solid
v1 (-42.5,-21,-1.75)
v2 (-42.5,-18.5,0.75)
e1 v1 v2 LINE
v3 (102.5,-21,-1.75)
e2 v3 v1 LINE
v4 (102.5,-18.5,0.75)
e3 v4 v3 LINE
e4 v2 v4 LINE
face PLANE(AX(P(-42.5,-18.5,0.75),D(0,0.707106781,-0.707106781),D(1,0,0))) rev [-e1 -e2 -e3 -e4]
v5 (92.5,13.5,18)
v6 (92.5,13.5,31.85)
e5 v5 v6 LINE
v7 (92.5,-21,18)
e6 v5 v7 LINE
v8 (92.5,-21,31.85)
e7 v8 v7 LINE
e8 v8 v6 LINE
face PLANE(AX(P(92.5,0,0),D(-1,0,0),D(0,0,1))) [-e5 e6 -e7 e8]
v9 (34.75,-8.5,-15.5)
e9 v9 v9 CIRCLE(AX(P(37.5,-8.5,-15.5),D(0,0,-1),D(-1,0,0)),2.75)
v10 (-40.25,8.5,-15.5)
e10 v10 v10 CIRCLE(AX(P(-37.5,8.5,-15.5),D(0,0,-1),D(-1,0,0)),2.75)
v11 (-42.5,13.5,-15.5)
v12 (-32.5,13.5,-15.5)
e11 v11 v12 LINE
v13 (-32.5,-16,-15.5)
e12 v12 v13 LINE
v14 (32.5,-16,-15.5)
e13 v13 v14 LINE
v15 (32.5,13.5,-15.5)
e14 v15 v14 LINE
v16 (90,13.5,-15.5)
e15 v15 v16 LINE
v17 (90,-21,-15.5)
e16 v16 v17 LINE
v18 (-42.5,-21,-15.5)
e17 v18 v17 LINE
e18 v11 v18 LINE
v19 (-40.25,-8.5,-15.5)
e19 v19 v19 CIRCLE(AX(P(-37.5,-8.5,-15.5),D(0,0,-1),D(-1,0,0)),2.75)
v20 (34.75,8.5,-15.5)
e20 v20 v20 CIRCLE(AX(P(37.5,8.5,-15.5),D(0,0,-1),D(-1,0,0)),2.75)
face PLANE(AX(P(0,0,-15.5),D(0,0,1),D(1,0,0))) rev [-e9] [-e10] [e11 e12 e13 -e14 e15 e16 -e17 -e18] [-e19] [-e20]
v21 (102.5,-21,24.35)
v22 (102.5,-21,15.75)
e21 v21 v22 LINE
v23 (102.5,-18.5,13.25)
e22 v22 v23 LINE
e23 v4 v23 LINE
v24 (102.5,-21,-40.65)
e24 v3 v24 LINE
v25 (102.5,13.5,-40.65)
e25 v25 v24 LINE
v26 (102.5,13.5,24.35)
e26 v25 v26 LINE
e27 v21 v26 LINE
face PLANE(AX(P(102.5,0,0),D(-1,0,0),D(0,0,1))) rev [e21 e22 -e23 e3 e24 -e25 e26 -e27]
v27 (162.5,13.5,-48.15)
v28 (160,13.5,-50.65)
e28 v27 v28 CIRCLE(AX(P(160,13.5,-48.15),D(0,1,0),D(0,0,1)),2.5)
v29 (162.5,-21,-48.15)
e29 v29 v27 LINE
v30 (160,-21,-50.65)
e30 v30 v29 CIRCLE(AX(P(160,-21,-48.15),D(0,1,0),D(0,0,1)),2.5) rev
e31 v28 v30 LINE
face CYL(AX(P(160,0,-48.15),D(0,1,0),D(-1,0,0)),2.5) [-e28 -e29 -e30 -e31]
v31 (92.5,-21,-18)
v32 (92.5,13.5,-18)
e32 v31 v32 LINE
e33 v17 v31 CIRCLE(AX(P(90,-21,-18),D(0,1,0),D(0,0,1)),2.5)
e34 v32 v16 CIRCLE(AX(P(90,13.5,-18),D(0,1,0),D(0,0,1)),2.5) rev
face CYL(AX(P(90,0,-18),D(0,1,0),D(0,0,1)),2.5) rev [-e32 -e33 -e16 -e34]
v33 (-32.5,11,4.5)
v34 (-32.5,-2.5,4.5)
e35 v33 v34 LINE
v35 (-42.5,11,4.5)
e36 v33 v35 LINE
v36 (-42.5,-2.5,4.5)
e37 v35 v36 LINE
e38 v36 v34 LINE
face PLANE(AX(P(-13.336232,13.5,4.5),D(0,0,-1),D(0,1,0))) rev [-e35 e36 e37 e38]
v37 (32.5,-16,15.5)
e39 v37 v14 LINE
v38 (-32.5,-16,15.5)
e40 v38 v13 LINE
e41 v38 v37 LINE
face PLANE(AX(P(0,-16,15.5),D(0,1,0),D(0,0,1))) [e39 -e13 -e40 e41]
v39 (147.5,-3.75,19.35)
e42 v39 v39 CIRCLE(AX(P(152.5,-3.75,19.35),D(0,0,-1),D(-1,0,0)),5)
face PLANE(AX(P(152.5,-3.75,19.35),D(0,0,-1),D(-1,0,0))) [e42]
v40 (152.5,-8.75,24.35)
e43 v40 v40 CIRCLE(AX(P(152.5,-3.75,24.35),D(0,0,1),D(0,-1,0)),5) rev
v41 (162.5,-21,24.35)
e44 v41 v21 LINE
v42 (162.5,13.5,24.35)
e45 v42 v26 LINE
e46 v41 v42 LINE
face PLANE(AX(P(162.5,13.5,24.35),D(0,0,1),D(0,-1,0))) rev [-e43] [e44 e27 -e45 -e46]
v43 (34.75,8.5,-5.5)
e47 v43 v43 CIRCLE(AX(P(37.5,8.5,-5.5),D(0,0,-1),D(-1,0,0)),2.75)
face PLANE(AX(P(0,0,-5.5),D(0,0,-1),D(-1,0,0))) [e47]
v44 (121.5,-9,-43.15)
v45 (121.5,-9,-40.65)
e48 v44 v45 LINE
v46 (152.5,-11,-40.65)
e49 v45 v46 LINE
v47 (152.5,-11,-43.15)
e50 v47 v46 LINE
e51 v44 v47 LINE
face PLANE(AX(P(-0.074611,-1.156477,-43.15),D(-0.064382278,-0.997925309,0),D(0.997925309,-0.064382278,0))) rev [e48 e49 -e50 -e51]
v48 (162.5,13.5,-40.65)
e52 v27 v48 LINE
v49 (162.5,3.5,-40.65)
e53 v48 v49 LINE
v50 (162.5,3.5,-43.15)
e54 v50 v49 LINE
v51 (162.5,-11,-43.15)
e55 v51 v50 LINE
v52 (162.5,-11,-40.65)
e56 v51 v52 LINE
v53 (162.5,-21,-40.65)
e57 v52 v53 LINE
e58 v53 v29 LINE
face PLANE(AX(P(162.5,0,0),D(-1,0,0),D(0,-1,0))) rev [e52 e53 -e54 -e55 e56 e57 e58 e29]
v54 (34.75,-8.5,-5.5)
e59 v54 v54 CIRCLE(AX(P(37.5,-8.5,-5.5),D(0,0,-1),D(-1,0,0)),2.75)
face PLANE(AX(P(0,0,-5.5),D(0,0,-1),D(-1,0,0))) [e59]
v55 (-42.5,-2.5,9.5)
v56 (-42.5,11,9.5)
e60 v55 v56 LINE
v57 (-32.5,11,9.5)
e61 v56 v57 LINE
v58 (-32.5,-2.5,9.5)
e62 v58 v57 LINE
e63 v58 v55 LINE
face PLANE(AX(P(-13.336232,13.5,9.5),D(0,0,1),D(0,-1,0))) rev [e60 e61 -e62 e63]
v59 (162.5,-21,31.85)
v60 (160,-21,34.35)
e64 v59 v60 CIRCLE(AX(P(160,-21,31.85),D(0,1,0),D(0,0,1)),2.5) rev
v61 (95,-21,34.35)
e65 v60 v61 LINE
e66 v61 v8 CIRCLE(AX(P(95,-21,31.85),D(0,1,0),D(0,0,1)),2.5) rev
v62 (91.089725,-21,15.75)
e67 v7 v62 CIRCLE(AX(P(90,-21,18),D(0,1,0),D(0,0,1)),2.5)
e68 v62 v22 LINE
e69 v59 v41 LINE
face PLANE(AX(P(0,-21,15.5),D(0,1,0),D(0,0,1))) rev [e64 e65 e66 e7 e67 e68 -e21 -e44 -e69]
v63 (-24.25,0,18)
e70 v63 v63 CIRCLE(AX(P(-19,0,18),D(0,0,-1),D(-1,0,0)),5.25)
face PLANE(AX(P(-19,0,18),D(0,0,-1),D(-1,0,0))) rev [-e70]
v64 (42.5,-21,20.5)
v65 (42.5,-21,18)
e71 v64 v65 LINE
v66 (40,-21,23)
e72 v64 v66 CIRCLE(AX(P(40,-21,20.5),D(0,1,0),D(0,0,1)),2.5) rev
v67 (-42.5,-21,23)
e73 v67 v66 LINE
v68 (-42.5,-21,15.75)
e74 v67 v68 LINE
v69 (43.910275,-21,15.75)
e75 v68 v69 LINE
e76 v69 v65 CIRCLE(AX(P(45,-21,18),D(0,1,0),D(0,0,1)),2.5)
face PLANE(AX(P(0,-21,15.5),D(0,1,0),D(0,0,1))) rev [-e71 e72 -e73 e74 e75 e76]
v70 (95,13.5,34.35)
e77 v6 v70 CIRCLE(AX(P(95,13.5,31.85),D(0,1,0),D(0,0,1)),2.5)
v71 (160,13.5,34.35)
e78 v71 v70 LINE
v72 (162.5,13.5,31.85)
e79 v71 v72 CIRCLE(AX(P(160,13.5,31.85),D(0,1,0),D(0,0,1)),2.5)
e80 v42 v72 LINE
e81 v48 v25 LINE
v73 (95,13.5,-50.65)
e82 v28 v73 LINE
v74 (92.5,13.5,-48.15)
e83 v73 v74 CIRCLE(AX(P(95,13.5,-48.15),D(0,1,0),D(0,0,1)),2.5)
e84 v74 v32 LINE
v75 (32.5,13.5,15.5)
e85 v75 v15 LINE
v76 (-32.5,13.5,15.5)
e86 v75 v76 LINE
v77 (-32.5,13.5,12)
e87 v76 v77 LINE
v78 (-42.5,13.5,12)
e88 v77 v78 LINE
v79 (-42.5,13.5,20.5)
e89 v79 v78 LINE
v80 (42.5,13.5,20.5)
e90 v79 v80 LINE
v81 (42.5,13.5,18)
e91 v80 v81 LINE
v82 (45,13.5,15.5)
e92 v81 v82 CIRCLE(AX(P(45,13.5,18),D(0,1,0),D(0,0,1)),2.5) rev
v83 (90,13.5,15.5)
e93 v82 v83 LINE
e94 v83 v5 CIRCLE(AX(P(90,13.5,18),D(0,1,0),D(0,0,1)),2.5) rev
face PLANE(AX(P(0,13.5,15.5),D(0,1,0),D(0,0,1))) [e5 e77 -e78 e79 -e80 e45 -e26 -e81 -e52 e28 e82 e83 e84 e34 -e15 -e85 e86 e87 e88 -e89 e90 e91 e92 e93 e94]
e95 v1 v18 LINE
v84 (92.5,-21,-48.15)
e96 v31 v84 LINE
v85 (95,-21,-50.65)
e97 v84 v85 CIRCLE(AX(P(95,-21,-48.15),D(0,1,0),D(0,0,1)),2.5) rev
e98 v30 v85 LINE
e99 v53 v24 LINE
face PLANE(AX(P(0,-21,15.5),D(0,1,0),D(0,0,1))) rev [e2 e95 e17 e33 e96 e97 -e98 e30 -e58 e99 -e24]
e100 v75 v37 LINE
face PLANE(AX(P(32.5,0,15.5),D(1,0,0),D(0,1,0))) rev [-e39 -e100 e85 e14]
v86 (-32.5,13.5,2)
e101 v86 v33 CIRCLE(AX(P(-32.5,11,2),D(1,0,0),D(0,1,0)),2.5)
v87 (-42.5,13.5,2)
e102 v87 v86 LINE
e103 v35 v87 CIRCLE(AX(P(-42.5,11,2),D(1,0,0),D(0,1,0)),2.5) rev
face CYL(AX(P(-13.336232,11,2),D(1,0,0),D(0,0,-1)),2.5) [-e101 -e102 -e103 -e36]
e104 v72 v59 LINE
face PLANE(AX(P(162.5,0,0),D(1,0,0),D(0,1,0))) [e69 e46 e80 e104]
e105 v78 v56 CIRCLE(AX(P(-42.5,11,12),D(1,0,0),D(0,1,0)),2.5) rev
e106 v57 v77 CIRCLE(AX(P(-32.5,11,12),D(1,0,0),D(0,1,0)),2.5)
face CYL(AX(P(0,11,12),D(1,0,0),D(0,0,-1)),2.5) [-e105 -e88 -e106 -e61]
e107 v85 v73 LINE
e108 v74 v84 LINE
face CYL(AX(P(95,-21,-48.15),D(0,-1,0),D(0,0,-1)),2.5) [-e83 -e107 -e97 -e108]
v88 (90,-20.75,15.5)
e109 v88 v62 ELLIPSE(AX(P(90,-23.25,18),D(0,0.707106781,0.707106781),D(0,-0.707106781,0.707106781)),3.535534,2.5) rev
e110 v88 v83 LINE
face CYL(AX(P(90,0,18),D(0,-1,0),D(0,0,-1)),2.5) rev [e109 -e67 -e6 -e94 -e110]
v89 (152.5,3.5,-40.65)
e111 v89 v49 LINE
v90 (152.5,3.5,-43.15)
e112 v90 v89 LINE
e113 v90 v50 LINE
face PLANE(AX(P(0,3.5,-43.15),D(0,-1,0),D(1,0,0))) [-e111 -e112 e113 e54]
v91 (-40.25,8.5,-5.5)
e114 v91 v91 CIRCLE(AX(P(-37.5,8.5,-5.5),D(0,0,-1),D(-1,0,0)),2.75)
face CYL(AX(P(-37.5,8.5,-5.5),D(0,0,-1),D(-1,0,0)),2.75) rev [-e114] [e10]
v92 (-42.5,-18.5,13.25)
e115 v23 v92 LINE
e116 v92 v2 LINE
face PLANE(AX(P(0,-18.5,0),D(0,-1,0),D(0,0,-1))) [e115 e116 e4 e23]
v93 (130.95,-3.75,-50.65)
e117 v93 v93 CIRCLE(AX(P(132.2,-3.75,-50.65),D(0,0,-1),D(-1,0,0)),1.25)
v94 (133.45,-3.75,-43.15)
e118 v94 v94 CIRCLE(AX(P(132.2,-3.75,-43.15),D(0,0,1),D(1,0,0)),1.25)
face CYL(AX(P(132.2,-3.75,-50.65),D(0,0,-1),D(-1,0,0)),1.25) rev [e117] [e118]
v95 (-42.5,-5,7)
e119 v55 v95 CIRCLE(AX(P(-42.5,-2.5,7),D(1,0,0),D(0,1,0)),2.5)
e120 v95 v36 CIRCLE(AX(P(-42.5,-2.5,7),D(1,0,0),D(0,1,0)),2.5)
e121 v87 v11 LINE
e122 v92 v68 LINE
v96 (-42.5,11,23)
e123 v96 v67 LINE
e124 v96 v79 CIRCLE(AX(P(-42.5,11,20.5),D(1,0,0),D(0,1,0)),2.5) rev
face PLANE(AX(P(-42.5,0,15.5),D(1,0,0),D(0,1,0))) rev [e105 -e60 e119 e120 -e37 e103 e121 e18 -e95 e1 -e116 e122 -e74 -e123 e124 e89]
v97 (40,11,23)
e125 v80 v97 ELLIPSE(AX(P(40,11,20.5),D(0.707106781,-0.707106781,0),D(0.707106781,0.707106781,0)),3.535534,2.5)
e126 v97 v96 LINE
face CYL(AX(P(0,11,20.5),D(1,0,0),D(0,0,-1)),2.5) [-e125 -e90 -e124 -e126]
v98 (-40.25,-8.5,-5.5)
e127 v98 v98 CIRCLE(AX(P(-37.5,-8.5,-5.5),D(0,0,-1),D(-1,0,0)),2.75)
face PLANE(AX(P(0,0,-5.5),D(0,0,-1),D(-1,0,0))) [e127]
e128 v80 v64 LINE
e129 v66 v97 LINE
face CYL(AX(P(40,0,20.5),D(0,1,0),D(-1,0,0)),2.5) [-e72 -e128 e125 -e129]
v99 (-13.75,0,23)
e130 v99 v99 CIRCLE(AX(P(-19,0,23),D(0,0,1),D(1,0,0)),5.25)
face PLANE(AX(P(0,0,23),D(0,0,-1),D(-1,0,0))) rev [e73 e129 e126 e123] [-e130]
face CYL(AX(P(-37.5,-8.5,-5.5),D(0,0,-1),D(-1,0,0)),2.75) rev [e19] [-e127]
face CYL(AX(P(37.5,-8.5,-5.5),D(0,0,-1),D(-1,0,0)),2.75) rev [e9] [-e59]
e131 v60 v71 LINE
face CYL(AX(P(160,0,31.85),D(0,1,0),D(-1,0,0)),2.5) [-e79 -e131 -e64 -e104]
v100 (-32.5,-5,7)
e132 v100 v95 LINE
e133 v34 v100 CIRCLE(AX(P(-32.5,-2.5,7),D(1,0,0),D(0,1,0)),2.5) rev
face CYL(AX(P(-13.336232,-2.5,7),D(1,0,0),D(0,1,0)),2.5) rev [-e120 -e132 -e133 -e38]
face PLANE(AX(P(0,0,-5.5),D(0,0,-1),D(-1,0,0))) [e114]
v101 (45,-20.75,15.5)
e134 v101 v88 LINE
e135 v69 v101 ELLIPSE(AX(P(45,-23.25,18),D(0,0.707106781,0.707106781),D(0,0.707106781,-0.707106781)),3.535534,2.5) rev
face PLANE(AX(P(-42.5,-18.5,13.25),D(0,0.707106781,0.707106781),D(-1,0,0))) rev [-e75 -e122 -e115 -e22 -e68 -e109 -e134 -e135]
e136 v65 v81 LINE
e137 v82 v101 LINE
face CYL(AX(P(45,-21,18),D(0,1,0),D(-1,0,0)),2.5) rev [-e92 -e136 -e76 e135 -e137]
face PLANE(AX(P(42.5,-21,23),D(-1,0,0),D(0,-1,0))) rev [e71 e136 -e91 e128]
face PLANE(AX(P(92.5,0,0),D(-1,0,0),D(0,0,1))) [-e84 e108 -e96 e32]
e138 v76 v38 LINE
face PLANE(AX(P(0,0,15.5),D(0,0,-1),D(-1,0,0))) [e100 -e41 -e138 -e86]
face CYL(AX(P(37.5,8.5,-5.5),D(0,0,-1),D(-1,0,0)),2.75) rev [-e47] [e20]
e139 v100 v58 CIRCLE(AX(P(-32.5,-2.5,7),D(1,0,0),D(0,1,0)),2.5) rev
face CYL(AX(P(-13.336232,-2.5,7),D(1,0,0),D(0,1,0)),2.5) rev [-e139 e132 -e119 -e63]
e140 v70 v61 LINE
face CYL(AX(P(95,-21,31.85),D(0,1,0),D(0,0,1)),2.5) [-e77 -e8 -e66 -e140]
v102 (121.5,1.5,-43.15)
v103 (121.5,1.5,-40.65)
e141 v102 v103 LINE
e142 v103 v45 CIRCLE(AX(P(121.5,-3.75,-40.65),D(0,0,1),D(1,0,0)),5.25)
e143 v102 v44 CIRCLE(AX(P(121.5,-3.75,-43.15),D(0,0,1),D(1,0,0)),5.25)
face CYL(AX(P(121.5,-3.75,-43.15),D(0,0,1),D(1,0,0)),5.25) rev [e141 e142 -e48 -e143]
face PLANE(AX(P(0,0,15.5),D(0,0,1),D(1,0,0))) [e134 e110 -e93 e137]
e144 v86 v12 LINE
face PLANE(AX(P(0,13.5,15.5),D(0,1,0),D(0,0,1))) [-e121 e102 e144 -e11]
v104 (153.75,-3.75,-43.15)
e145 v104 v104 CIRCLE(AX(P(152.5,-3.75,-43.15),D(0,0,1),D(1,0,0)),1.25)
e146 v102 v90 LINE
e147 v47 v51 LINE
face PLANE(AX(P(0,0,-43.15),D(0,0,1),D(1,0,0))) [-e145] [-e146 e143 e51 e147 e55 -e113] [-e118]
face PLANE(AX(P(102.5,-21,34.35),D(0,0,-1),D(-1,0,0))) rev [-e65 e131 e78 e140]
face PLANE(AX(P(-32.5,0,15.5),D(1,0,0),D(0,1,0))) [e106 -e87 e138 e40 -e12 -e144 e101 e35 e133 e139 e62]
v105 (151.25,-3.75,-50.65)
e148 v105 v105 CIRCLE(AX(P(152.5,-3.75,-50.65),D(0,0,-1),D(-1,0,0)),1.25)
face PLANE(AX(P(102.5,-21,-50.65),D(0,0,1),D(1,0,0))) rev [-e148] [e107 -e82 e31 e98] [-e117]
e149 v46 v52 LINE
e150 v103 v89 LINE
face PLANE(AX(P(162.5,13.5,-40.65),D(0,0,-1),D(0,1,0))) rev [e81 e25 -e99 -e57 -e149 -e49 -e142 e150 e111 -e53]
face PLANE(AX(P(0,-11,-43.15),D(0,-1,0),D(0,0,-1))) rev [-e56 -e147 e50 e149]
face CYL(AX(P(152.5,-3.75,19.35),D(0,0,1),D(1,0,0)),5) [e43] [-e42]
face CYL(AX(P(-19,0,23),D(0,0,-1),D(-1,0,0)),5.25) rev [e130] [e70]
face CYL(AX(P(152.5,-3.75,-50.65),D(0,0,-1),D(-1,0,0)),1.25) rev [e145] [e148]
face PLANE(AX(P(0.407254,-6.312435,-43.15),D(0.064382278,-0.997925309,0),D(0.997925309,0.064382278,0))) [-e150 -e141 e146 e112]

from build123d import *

# Parameters (mm, degrees)
SKETCH1_W                 = 10
SKETCH1_H                 = 29.5
SKETCH1_R                 = 2.75
BOSS_EXTRUDE1_DEPTH       = 15.5
SKETCH15_R                = 2.75
CUT_EXTRUDE5_DEPTH        = 10
SKETCH2_W                 = 85
SKETCH2_H                 = 34.5
SKETCH2_R                 = 5.25
BOSS_EXTRUDE2_DEPTH       = 7.5
SKETCH4_W                 = 85
SKETCH4_H                 = 34.5
BOSS_EXTRUDE3_DEPTH       = 10
SKETCH5_W                 = 10
SKETCH5_H                 = 34.5
BOSS_EXTRUDE4_DEPTH       = 60
SKETCH6_R                 = 5
BOSS_EXTRUDE5_DEPTH       = 5
CUT_EXTRUDE2_DEPTH        = 2.5
SKETCH10_W                = 5
SKETCH10_H                = 18.5
CUT_EXTRUDE4_DEPTH        = 10
F_2_5MM_DOWEL_HOLE1_D     = 2.5
F_2_5MM_DOWEL_HOLE1_DEPTH = 10
F_2_5MM_DOWEL_HOLE1_TIP   = 0.751075774
FILLET1_R                 = 2.5
SKETCH14_R                = 5.25
BOSS_EXTRUDE6_DEPTH       = 2.5
FILLET2_R                 = 2.5
SKETCH17_W                = 145
SKETCH17_H                = 12.5
CUT_EXTRUDE7_DEPTH        = 2.5
CHAMFER1_SIZE             = 2.5


# Some blends are built 0.0001 mm under size
with BuildPart() as part:
    # Sketch1 → Boss-Extrude1 (new, symmetric)
    # profile 1 of 8: a face of its own
    with BuildSketch(Plane.XY):
        with Locations((-37.5, -1.25)):
            Rectangle(SKETCH1_W, SKETCH1_H)
        with Locations((-37.5, -8.5)):
            Circle(SKETCH1_R, mode=Mode.SUBTRACT)
        with Locations((-37.5, 8.5)):
            Circle(SKETCH1_R, mode=Mode.SUBTRACT)
    # profile 2 of 8: a face of its own
    with BuildSketch(Plane.XY):
        Polygon((-32.5, -16), (-42.5, -16), (-42.5, -21), (42.5, -21), (42.5, -16), (32.5, -16), align=None)
    # profile 3 of 8: a face of its own
    with BuildSketch(Plane.XY):
        with Locations((37.5, -1.25)):
            Rectangle(SKETCH1_W, SKETCH1_H)
        with Locations((37.5, -8.5)):
            Circle(SKETCH1_R, mode=Mode.SUBTRACT)
        with Locations((37.5, 8.5)):
            Circle(SKETCH1_R, mode=Mode.SUBTRACT)
    # profile 4 of 8: a face of its own
    with BuildSketch(Plane.XY):
        with Locations((-37.5, 8.5)):
            Circle(SKETCH1_R)
    # profile 5 of 8: a face of its own
    with BuildSketch(Plane.XY):
        with Locations((-37.5, -8.5)):
            Circle(SKETCH1_R)
    # profile 6 of 8: a face of its own
    with BuildSketch(Plane.XY):
        with Locations((37.5, 8.5)):
            Circle(SKETCH1_R)
    # profile 7 of 8: a face of its own
    with BuildSketch(Plane.XY):
        with Locations((37.5, -8.5)):
            Circle(SKETCH1_R)
    # profile 8 of 8: a face of its own
    with BuildSketch(Plane.XY):
        Polygon((42.5, -21), (92.5, -21), (92.5, 13.5), (42.5, 13.5), (42.5, -16), align=None)
    extrude(amount=BOSS_EXTRUDE1_DEPTH, both=True)

    # Sketch15 → Cut-Extrude5 (cut)
    with BuildSketch(Plane(origin=(0, 0, -15.5), x_dir=(-1, 0, 0), z_dir=(0, 0, -1))):
        with Locations((-37.5, 8.5)):
            Circle(SKETCH15_R)
        with Locations((-37.5, -8.5)):
            Circle(SKETCH15_R)
        with Locations((37.5, 8.5)):
            Circle(SKETCH15_R)
        with Locations((37.5, -8.5)):
            Circle(SKETCH15_R)
    extrude(amount=-CUT_EXTRUDE5_DEPTH, mode=Mode.SUBTRACT)

    # Sketch2 → Boss-Extrude2 (add)
    with BuildSketch(Plane.XY.offset(15.5)):
        with Locations((0, -3.75)):
            Rectangle(SKETCH2_W, SKETCH2_H)
        with Locations((-19, 0)):
            Circle(SKETCH2_R, mode=Mode.SUBTRACT)
    extrude(amount=BOSS_EXTRUDE2_DEPTH)

    # Sketch4 → Boss-Extrude3 (add)
    with BuildSketch(Plane(origin=(92.5, 0, 0), x_dir=(0, 0, -1), z_dir=(1, 0, 0))):
        with Locations((8.15, -3.75)):
            Rectangle(SKETCH4_W, SKETCH4_H)
    extrude(amount=BOSS_EXTRUDE3_DEPTH)

    # Sketch5 → Boss-Extrude4 (add)
    with BuildSketch(Plane(origin=(102.5, 0, 0), x_dir=(0, 0, -1), z_dir=(1, 0, 0))):
        with Locations((-29.35, -3.75)):
            Rectangle(SKETCH5_W, SKETCH5_H)
        with Locations((45.65, -3.75)):
            Rectangle(SKETCH5_W, SKETCH5_H)
    extrude(amount=BOSS_EXTRUDE4_DEPTH)

    # Sketch6 → Boss-Extrude5 (add)
    with BuildSketch(Plane(origin=(0, 0, 24.35), x_dir=(-1, 0, 0), z_dir=(0, 0, -1))):
        with Locations(Location((-152.5, -3.75, 0), (0, 0, 270))):
            Circle(SKETCH6_R)
    extrude(amount=BOSS_EXTRUDE5_DEPTH)

    # Sketch8 → Cut-Extrude2 (cut)
    with BuildSketch(Plane.XY.offset(-40.65)):
        with BuildLine():
            ThreePointArc((121.500000004, 1.499999993), (116.250000004, -3.750000007), (121.500000004, -9.000000007))
            Line((121.500000004, -9.000000007), (152.500000004, -11.000000007))
            Line((152.500000004, -11.000000007), (162.5, -11.000000007))
            Line((162.5, -11.000000007), (162.5, 3.499999993))
            Line((162.5, 3.499999993), (152.500000004, 3.499999993))
            Line((152.500000004, 3.499999993), (121.500000004, 1.499999993))
        make_face()
    extrude(amount=-CUT_EXTRUDE2_DEPTH, mode=Mode.SUBTRACT)

    # Sketch10 → Cut-Extrude4 (cut)
    with BuildSketch(Plane.ZY.offset(42.5)):
        with Locations((7, 4.25)):
            Rectangle(SKETCH10_W, SKETCH10_H)
    extrude(amount=-CUT_EXTRUDE4_DEPTH, mode=Mode.SUBTRACT)

    # Ø2.5mm Dowel Hole1
    with Locations(Plane(origin=(0, 0, -50.65), x_dir=(-1, 0, 0), z_dir=(0, 0, -1))):
        with Locations((-132.2, -3.75), (-152.5, -3.75)):
            Hole(F_2_5MM_DOWEL_HOLE1_D / 2, depth=F_2_5MM_DOWEL_HOLE1_DEPTH)
            with Locations((0, 0, -(F_2_5MM_DOWEL_HOLE1_DEPTH + F_2_5MM_DOWEL_HOLE1_TIP / 2))):  # 118° drill point
                Cone(0, F_2_5MM_DOWEL_HOLE1_D / 2, F_2_5MM_DOWEL_HOLE1_TIP, mode=Mode.SUBTRACT)

    # Fillet1
    fillet1_edges = [part.edges().sort_by_distance(p)[0] for p in [
        (92.5, -3.75, -15.5),
        (92.5, -3.75, 15.5),
        (42.5, -3.75, 23),
        (0, 13.5, 23),
        (42.5, -3.75, 15.5),
        (92.5, -3.75, -50.65),
        (92.5, -3.75, 34.35),
        (162.5, -3.75, 34.35),
        (162.5, -3.75, -50.65),
    ]]
    fillet(fillet1_edges, radius=FILLET1_R)

    # Sketch14 → Boss-Extrude6 (add)
    with BuildSketch(Plane(origin=(0, 0, 15.5), x_dir=(-1, 0, 0), z_dir=(0, 0, -1))):
        with Locations((19, 0)):
            Circle(SKETCH14_R)
    extrude(amount=-BOSS_EXTRUDE6_DEPTH)

    # Fillet2
    fillet2_edges = [part.edges().sort_by_distance(p)[0] for p in [
        (-37.5, -5, 9.5),
        (-37.5, -5, 4.5),
    ]]
    fillet(fillet2_edges, radius=FILLET2_R - 0.0001)  # a hair under: the kernel refuses the full size
    fillet2_2_edges = [part.edges().sort_by_distance(p)[0] for p in [
        (-37.5, 13.5, 9.5),
        (-37.5, 13.5, 4.5),
    ]]
    fillet(fillet2_2_edges, radius=FILLET2_R)

    # Sketch17 → Cut-Extrude7 (cut)
    with BuildSketch(Plane.XZ.offset(21)):
        with Locations((30, 7)):
            Rectangle(SKETCH17_W, SKETCH17_H)
    extrude(amount=-CUT_EXTRUDE7_DEPTH, mode=Mode.SUBTRACT)

    # Chamfer1
    # the kernel refuses this chamfer: 2.5 mm, written as the material it takes off along each edge
    with BuildSketch(Plane(origin=(108.92920747, -21, 0.75), x_dir=(0, -0.027495876610586317, -0.9996219169112968), z_dir=(-1, 0, 0))) as chamfer1_piece_1_section:
        Polygon((CHAMFER1_SIZE * 0.999621916911, -CHAMFER1_SIZE * 0.0274958766106), (-CHAMFER1_SIZE * 0.0274958766106, -CHAMFER1_SIZE * 0.999621916911), (0, 0), align=None)
    chamfer1_piece_1 = extrude(amount=157.85841494, mode=Mode.PRIVATE)
    chamfer1_piece_1 = split(chamfer1_piece_1, bisect_by=Plane(origin=(30, -18.5, -0.076010386), z_dir=(0, -1, 0)), keep=Keep.TOP, mode=Mode.PRIVATE)
    add(chamfer1_piece_1, mode=Mode.SUBTRACT)
    with BuildSketch(Plane(origin=(-48.92920747, -21, 13.25), x_dir=(0, 0.9996219169112968, -0.027495876610586317), z_dir=(1, 0, 0))) as chamfer1_piece_2_section:
        Polygon((CHAMFER1_SIZE * 0.999621916911, CHAMFER1_SIZE * 0.0274958766106), (-CHAMFER1_SIZE * 0.0274958766106, CHAMFER1_SIZE * 0.999621916911), (0, 0), align=None)
    chamfer1_piece_2 = extrude(amount=157.85841494, mode=Mode.PRIVATE)
    chamfer1_piece_2 = split(chamfer1_piece_2, bisect_by=Plane(origin=(30, -18.5, 14.076010386), z_dir=(0, -1, 0)), keep=Keep.TOP, mode=Mode.PRIVATE)
    add(chamfer1_piece_2, mode=Mode.SUBTRACT)


solid = part.part
